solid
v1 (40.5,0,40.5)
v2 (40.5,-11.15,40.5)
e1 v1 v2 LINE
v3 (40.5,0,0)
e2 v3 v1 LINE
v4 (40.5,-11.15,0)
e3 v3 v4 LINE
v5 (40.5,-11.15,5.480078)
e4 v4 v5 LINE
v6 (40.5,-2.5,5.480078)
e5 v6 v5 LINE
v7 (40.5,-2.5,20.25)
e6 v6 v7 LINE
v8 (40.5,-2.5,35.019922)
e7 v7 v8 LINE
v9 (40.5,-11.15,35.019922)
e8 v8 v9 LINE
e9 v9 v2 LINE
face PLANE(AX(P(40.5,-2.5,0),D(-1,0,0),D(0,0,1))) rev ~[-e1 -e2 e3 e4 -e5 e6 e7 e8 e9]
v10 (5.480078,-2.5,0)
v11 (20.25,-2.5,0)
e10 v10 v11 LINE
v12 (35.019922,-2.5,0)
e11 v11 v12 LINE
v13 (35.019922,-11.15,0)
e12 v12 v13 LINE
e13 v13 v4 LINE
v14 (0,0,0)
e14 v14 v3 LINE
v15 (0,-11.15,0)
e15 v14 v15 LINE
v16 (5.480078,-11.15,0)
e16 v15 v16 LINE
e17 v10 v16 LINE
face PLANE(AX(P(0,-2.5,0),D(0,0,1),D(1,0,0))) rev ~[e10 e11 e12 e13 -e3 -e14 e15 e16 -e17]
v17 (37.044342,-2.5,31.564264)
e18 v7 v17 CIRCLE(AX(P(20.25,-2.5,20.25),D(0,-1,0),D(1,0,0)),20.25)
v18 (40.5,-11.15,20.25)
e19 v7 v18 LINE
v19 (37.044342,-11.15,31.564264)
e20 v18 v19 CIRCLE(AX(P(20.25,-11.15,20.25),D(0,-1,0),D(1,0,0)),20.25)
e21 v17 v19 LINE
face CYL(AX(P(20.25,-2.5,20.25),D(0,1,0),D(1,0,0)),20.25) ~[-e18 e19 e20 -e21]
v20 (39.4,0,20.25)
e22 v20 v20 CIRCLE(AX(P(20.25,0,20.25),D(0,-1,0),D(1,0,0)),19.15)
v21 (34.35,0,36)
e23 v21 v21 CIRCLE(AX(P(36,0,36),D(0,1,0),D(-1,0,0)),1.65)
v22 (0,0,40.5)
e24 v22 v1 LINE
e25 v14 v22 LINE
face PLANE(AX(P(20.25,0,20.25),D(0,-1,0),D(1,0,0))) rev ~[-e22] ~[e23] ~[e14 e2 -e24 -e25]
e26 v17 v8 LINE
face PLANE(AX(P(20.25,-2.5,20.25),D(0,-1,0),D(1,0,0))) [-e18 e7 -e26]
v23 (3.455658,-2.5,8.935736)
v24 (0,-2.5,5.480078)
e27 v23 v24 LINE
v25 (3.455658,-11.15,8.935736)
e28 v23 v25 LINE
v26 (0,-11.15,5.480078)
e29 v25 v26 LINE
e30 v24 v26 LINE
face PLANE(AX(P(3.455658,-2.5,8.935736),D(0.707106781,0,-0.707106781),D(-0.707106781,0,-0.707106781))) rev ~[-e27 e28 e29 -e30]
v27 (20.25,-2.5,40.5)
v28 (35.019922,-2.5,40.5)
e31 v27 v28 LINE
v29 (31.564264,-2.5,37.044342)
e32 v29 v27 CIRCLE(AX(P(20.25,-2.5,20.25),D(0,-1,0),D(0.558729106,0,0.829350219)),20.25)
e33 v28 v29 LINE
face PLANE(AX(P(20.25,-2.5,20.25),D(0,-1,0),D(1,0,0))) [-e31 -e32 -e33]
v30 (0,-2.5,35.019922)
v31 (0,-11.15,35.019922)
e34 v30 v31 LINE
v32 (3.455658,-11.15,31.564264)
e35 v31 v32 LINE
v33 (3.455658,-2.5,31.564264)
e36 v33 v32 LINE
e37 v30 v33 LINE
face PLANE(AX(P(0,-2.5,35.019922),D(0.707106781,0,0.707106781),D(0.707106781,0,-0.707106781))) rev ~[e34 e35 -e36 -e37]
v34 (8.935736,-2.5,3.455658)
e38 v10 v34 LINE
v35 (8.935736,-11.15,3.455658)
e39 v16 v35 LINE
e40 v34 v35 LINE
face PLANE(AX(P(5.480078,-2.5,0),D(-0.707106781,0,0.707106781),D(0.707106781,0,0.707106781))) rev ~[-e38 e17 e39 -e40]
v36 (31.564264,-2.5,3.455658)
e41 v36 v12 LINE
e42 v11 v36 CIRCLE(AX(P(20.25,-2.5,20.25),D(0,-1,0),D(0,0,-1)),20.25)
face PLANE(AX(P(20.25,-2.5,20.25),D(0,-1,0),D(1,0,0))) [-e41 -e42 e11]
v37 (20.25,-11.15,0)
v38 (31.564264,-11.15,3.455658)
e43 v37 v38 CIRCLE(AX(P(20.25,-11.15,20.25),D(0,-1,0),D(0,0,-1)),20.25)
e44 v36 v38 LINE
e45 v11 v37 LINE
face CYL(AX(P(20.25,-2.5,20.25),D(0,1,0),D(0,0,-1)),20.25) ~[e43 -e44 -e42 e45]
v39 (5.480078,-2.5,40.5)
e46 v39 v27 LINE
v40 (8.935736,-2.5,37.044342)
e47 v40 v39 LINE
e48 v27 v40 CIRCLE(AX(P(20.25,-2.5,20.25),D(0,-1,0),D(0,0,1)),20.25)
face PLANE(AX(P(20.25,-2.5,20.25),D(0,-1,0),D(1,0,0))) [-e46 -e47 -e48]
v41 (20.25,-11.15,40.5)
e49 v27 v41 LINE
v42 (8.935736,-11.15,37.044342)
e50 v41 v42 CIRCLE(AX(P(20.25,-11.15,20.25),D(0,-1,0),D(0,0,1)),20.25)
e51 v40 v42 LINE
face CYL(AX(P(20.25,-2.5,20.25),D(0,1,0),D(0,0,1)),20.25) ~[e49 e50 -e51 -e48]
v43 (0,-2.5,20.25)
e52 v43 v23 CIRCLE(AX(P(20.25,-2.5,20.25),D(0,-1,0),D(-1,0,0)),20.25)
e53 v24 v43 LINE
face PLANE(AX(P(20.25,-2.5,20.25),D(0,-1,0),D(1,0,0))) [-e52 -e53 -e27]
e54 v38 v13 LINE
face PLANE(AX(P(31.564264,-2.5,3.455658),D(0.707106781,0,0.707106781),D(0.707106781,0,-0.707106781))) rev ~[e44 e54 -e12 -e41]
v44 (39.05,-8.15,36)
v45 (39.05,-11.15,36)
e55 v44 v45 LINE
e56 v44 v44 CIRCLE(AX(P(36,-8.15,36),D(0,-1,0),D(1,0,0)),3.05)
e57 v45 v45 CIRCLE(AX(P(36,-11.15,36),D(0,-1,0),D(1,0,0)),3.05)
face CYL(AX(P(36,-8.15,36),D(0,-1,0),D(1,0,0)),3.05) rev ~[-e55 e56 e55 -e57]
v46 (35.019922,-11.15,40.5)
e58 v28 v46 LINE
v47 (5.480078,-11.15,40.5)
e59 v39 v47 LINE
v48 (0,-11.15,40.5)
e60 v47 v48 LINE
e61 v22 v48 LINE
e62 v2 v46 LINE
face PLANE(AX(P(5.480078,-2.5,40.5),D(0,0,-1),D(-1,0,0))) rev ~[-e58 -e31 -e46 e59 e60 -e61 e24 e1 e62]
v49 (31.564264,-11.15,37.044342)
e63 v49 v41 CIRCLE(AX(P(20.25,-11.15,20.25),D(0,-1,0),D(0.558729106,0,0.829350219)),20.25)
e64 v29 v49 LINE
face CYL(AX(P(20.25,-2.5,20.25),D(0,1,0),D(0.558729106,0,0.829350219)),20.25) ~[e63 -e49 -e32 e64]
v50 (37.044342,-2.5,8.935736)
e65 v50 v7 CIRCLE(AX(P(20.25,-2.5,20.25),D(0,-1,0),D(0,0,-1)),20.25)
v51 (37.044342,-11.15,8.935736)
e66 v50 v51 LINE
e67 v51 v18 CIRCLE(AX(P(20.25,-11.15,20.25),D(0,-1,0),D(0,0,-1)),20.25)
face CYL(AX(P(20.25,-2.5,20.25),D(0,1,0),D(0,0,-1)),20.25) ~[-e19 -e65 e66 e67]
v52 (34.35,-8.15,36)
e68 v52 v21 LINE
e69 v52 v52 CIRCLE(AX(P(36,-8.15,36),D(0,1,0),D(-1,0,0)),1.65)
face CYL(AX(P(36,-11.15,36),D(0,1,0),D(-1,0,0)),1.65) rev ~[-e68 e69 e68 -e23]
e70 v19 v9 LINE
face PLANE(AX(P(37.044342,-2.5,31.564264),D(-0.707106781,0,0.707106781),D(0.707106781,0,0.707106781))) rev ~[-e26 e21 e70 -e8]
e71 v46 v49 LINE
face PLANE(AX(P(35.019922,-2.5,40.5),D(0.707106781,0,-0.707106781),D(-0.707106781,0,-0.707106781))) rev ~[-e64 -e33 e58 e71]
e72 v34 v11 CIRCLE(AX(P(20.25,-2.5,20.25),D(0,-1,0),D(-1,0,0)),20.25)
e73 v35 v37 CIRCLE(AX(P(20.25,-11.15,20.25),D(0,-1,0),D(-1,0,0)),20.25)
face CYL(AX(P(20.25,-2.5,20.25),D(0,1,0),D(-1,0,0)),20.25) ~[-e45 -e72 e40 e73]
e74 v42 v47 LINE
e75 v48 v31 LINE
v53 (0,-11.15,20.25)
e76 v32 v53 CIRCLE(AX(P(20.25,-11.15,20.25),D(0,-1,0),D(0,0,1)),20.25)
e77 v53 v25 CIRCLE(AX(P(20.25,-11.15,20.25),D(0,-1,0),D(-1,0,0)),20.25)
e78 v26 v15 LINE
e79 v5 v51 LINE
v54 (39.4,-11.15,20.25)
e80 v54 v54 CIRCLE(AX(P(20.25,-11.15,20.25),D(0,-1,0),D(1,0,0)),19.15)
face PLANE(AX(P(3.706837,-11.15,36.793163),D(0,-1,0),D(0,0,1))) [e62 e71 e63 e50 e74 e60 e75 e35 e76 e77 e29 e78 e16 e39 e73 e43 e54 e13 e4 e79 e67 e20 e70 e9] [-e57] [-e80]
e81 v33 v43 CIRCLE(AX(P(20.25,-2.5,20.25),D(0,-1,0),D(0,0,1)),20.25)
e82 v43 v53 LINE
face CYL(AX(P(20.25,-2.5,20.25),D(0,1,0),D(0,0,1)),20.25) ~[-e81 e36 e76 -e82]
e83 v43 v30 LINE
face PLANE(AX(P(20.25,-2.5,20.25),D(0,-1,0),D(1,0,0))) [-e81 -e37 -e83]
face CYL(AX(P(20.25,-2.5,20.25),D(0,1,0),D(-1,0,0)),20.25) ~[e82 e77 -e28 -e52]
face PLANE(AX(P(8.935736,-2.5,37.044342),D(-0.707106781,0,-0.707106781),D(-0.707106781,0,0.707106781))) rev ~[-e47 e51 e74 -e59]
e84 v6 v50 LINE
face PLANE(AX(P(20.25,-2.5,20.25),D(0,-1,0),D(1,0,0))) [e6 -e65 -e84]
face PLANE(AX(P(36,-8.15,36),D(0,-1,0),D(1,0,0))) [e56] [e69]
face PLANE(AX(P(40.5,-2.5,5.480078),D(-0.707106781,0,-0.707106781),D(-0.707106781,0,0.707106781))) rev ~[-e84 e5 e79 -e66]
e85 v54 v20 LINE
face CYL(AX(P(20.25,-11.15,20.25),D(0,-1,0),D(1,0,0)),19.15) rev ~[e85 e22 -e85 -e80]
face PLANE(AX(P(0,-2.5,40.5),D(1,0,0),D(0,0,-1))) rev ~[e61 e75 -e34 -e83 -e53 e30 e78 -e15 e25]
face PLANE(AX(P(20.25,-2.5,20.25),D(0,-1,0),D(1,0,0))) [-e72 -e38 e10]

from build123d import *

# Parameters (mm, degrees)
F0_W            = 40.5
F0_H            = 40.5
F1_DEPTH        = 2.5
F3_DEPTH        = 8.65
F4_DEPTH        = 8.65
F4_COPIES_COUNT = 4
F5_R            = 19.15
F6_DEPTH        = 11.151
F8_D            = 3.3
F8_CBORE_D      = 6.1
F8_CBORE_DEPTH  = 3


# Not quite as in the source:
# - a pattern or mirror of a feature is missing from the dataset's text; its kind, count and spacing are read off the source's solid


with BuildPart() as f1:
    # F0 (on Front) → F1 (new body)
    with BuildSketch(Plane.XZ):
        with Locations((20.25, 20.25)):
            Rectangle(F0_W, F0_H)
    extrude(amount=F1_DEPTH)

    # F2 (on face) → F3 (join)
    with BuildSketch(Plane.XZ.offset(2.5)):
        with BuildLine():
            ThreePointArc((20.25, 0), (34.568912319, 5.931087681), (40.5, 20.25))
            ThreePointArc((40.5, 20.25), (39.6168263322, 26.1651109727), (37.0443419437, 31.5642643895))
            ThreePointArc((37.0443419437, 31.5642643895), (34.568912319, 34.568912319), (31.5642643895, 37.0443419437))
            ThreePointArc((31.5642643895, 37.0443419437), (26.1651109727, 39.6168263322), (20.25, 40.5))
            ThreePointArc((20.25, 40.5), (5.931087681, 34.568912319), (0, 20.25))
            ThreePointArc((0, 20.25), (5.931087681, 5.931087681), (20.25, 0))
        make_face()
    extrude(amount=F3_DEPTH)

    # F2 (on face) → F4 (join, through all)
    with BuildSketch(Plane.XZ.offset(2.5)):
        with BuildLine():
            ThreePointArc((31.5642643895, 37.0443419437), (34.568912319, 34.568912319), (37.0443419437, 31.5642643895))
            Line((37.0443419437, 31.5642643895), (40.5, 35.0199224458))
            Line((40.5, 35.0199224458), (40.5, 40.5))
            Line((40.5, 40.5), (35.0199224458, 40.5))
            Line((35.0199224458, 40.5), (31.5642643895, 37.0443419437))
        make_face()
    f4 = extrude(amount=F4_DEPTH)

    # F4_copies: F4 ×4 about axis
    f4_copies_axis = Axis((20.25, 0, 20.25), (0, 1, 0))
    for i in range(1, F4_COPIES_COUNT):
        add(f4.rotate(f4_copies_axis, i * 360 / F4_COPIES_COUNT))

    # F5 (on face) → F6 (cut, through all)
    with BuildSketch(Plane.XZ.offset(11.15)):
        with Locations((20.25, 20.25)):
            Circle(F5_R)
    extrude(amount=-F6_DEPTH, mode=Mode.SUBTRACT)

    # F8 (through all)
    with Locations(Plane.XZ.offset(11.15)):
        with Locations((36, 36)):
            CounterBoreHole(F8_D / 2, F8_CBORE_D / 2, F8_CBORE_DEPTH)


solid = f1.part
